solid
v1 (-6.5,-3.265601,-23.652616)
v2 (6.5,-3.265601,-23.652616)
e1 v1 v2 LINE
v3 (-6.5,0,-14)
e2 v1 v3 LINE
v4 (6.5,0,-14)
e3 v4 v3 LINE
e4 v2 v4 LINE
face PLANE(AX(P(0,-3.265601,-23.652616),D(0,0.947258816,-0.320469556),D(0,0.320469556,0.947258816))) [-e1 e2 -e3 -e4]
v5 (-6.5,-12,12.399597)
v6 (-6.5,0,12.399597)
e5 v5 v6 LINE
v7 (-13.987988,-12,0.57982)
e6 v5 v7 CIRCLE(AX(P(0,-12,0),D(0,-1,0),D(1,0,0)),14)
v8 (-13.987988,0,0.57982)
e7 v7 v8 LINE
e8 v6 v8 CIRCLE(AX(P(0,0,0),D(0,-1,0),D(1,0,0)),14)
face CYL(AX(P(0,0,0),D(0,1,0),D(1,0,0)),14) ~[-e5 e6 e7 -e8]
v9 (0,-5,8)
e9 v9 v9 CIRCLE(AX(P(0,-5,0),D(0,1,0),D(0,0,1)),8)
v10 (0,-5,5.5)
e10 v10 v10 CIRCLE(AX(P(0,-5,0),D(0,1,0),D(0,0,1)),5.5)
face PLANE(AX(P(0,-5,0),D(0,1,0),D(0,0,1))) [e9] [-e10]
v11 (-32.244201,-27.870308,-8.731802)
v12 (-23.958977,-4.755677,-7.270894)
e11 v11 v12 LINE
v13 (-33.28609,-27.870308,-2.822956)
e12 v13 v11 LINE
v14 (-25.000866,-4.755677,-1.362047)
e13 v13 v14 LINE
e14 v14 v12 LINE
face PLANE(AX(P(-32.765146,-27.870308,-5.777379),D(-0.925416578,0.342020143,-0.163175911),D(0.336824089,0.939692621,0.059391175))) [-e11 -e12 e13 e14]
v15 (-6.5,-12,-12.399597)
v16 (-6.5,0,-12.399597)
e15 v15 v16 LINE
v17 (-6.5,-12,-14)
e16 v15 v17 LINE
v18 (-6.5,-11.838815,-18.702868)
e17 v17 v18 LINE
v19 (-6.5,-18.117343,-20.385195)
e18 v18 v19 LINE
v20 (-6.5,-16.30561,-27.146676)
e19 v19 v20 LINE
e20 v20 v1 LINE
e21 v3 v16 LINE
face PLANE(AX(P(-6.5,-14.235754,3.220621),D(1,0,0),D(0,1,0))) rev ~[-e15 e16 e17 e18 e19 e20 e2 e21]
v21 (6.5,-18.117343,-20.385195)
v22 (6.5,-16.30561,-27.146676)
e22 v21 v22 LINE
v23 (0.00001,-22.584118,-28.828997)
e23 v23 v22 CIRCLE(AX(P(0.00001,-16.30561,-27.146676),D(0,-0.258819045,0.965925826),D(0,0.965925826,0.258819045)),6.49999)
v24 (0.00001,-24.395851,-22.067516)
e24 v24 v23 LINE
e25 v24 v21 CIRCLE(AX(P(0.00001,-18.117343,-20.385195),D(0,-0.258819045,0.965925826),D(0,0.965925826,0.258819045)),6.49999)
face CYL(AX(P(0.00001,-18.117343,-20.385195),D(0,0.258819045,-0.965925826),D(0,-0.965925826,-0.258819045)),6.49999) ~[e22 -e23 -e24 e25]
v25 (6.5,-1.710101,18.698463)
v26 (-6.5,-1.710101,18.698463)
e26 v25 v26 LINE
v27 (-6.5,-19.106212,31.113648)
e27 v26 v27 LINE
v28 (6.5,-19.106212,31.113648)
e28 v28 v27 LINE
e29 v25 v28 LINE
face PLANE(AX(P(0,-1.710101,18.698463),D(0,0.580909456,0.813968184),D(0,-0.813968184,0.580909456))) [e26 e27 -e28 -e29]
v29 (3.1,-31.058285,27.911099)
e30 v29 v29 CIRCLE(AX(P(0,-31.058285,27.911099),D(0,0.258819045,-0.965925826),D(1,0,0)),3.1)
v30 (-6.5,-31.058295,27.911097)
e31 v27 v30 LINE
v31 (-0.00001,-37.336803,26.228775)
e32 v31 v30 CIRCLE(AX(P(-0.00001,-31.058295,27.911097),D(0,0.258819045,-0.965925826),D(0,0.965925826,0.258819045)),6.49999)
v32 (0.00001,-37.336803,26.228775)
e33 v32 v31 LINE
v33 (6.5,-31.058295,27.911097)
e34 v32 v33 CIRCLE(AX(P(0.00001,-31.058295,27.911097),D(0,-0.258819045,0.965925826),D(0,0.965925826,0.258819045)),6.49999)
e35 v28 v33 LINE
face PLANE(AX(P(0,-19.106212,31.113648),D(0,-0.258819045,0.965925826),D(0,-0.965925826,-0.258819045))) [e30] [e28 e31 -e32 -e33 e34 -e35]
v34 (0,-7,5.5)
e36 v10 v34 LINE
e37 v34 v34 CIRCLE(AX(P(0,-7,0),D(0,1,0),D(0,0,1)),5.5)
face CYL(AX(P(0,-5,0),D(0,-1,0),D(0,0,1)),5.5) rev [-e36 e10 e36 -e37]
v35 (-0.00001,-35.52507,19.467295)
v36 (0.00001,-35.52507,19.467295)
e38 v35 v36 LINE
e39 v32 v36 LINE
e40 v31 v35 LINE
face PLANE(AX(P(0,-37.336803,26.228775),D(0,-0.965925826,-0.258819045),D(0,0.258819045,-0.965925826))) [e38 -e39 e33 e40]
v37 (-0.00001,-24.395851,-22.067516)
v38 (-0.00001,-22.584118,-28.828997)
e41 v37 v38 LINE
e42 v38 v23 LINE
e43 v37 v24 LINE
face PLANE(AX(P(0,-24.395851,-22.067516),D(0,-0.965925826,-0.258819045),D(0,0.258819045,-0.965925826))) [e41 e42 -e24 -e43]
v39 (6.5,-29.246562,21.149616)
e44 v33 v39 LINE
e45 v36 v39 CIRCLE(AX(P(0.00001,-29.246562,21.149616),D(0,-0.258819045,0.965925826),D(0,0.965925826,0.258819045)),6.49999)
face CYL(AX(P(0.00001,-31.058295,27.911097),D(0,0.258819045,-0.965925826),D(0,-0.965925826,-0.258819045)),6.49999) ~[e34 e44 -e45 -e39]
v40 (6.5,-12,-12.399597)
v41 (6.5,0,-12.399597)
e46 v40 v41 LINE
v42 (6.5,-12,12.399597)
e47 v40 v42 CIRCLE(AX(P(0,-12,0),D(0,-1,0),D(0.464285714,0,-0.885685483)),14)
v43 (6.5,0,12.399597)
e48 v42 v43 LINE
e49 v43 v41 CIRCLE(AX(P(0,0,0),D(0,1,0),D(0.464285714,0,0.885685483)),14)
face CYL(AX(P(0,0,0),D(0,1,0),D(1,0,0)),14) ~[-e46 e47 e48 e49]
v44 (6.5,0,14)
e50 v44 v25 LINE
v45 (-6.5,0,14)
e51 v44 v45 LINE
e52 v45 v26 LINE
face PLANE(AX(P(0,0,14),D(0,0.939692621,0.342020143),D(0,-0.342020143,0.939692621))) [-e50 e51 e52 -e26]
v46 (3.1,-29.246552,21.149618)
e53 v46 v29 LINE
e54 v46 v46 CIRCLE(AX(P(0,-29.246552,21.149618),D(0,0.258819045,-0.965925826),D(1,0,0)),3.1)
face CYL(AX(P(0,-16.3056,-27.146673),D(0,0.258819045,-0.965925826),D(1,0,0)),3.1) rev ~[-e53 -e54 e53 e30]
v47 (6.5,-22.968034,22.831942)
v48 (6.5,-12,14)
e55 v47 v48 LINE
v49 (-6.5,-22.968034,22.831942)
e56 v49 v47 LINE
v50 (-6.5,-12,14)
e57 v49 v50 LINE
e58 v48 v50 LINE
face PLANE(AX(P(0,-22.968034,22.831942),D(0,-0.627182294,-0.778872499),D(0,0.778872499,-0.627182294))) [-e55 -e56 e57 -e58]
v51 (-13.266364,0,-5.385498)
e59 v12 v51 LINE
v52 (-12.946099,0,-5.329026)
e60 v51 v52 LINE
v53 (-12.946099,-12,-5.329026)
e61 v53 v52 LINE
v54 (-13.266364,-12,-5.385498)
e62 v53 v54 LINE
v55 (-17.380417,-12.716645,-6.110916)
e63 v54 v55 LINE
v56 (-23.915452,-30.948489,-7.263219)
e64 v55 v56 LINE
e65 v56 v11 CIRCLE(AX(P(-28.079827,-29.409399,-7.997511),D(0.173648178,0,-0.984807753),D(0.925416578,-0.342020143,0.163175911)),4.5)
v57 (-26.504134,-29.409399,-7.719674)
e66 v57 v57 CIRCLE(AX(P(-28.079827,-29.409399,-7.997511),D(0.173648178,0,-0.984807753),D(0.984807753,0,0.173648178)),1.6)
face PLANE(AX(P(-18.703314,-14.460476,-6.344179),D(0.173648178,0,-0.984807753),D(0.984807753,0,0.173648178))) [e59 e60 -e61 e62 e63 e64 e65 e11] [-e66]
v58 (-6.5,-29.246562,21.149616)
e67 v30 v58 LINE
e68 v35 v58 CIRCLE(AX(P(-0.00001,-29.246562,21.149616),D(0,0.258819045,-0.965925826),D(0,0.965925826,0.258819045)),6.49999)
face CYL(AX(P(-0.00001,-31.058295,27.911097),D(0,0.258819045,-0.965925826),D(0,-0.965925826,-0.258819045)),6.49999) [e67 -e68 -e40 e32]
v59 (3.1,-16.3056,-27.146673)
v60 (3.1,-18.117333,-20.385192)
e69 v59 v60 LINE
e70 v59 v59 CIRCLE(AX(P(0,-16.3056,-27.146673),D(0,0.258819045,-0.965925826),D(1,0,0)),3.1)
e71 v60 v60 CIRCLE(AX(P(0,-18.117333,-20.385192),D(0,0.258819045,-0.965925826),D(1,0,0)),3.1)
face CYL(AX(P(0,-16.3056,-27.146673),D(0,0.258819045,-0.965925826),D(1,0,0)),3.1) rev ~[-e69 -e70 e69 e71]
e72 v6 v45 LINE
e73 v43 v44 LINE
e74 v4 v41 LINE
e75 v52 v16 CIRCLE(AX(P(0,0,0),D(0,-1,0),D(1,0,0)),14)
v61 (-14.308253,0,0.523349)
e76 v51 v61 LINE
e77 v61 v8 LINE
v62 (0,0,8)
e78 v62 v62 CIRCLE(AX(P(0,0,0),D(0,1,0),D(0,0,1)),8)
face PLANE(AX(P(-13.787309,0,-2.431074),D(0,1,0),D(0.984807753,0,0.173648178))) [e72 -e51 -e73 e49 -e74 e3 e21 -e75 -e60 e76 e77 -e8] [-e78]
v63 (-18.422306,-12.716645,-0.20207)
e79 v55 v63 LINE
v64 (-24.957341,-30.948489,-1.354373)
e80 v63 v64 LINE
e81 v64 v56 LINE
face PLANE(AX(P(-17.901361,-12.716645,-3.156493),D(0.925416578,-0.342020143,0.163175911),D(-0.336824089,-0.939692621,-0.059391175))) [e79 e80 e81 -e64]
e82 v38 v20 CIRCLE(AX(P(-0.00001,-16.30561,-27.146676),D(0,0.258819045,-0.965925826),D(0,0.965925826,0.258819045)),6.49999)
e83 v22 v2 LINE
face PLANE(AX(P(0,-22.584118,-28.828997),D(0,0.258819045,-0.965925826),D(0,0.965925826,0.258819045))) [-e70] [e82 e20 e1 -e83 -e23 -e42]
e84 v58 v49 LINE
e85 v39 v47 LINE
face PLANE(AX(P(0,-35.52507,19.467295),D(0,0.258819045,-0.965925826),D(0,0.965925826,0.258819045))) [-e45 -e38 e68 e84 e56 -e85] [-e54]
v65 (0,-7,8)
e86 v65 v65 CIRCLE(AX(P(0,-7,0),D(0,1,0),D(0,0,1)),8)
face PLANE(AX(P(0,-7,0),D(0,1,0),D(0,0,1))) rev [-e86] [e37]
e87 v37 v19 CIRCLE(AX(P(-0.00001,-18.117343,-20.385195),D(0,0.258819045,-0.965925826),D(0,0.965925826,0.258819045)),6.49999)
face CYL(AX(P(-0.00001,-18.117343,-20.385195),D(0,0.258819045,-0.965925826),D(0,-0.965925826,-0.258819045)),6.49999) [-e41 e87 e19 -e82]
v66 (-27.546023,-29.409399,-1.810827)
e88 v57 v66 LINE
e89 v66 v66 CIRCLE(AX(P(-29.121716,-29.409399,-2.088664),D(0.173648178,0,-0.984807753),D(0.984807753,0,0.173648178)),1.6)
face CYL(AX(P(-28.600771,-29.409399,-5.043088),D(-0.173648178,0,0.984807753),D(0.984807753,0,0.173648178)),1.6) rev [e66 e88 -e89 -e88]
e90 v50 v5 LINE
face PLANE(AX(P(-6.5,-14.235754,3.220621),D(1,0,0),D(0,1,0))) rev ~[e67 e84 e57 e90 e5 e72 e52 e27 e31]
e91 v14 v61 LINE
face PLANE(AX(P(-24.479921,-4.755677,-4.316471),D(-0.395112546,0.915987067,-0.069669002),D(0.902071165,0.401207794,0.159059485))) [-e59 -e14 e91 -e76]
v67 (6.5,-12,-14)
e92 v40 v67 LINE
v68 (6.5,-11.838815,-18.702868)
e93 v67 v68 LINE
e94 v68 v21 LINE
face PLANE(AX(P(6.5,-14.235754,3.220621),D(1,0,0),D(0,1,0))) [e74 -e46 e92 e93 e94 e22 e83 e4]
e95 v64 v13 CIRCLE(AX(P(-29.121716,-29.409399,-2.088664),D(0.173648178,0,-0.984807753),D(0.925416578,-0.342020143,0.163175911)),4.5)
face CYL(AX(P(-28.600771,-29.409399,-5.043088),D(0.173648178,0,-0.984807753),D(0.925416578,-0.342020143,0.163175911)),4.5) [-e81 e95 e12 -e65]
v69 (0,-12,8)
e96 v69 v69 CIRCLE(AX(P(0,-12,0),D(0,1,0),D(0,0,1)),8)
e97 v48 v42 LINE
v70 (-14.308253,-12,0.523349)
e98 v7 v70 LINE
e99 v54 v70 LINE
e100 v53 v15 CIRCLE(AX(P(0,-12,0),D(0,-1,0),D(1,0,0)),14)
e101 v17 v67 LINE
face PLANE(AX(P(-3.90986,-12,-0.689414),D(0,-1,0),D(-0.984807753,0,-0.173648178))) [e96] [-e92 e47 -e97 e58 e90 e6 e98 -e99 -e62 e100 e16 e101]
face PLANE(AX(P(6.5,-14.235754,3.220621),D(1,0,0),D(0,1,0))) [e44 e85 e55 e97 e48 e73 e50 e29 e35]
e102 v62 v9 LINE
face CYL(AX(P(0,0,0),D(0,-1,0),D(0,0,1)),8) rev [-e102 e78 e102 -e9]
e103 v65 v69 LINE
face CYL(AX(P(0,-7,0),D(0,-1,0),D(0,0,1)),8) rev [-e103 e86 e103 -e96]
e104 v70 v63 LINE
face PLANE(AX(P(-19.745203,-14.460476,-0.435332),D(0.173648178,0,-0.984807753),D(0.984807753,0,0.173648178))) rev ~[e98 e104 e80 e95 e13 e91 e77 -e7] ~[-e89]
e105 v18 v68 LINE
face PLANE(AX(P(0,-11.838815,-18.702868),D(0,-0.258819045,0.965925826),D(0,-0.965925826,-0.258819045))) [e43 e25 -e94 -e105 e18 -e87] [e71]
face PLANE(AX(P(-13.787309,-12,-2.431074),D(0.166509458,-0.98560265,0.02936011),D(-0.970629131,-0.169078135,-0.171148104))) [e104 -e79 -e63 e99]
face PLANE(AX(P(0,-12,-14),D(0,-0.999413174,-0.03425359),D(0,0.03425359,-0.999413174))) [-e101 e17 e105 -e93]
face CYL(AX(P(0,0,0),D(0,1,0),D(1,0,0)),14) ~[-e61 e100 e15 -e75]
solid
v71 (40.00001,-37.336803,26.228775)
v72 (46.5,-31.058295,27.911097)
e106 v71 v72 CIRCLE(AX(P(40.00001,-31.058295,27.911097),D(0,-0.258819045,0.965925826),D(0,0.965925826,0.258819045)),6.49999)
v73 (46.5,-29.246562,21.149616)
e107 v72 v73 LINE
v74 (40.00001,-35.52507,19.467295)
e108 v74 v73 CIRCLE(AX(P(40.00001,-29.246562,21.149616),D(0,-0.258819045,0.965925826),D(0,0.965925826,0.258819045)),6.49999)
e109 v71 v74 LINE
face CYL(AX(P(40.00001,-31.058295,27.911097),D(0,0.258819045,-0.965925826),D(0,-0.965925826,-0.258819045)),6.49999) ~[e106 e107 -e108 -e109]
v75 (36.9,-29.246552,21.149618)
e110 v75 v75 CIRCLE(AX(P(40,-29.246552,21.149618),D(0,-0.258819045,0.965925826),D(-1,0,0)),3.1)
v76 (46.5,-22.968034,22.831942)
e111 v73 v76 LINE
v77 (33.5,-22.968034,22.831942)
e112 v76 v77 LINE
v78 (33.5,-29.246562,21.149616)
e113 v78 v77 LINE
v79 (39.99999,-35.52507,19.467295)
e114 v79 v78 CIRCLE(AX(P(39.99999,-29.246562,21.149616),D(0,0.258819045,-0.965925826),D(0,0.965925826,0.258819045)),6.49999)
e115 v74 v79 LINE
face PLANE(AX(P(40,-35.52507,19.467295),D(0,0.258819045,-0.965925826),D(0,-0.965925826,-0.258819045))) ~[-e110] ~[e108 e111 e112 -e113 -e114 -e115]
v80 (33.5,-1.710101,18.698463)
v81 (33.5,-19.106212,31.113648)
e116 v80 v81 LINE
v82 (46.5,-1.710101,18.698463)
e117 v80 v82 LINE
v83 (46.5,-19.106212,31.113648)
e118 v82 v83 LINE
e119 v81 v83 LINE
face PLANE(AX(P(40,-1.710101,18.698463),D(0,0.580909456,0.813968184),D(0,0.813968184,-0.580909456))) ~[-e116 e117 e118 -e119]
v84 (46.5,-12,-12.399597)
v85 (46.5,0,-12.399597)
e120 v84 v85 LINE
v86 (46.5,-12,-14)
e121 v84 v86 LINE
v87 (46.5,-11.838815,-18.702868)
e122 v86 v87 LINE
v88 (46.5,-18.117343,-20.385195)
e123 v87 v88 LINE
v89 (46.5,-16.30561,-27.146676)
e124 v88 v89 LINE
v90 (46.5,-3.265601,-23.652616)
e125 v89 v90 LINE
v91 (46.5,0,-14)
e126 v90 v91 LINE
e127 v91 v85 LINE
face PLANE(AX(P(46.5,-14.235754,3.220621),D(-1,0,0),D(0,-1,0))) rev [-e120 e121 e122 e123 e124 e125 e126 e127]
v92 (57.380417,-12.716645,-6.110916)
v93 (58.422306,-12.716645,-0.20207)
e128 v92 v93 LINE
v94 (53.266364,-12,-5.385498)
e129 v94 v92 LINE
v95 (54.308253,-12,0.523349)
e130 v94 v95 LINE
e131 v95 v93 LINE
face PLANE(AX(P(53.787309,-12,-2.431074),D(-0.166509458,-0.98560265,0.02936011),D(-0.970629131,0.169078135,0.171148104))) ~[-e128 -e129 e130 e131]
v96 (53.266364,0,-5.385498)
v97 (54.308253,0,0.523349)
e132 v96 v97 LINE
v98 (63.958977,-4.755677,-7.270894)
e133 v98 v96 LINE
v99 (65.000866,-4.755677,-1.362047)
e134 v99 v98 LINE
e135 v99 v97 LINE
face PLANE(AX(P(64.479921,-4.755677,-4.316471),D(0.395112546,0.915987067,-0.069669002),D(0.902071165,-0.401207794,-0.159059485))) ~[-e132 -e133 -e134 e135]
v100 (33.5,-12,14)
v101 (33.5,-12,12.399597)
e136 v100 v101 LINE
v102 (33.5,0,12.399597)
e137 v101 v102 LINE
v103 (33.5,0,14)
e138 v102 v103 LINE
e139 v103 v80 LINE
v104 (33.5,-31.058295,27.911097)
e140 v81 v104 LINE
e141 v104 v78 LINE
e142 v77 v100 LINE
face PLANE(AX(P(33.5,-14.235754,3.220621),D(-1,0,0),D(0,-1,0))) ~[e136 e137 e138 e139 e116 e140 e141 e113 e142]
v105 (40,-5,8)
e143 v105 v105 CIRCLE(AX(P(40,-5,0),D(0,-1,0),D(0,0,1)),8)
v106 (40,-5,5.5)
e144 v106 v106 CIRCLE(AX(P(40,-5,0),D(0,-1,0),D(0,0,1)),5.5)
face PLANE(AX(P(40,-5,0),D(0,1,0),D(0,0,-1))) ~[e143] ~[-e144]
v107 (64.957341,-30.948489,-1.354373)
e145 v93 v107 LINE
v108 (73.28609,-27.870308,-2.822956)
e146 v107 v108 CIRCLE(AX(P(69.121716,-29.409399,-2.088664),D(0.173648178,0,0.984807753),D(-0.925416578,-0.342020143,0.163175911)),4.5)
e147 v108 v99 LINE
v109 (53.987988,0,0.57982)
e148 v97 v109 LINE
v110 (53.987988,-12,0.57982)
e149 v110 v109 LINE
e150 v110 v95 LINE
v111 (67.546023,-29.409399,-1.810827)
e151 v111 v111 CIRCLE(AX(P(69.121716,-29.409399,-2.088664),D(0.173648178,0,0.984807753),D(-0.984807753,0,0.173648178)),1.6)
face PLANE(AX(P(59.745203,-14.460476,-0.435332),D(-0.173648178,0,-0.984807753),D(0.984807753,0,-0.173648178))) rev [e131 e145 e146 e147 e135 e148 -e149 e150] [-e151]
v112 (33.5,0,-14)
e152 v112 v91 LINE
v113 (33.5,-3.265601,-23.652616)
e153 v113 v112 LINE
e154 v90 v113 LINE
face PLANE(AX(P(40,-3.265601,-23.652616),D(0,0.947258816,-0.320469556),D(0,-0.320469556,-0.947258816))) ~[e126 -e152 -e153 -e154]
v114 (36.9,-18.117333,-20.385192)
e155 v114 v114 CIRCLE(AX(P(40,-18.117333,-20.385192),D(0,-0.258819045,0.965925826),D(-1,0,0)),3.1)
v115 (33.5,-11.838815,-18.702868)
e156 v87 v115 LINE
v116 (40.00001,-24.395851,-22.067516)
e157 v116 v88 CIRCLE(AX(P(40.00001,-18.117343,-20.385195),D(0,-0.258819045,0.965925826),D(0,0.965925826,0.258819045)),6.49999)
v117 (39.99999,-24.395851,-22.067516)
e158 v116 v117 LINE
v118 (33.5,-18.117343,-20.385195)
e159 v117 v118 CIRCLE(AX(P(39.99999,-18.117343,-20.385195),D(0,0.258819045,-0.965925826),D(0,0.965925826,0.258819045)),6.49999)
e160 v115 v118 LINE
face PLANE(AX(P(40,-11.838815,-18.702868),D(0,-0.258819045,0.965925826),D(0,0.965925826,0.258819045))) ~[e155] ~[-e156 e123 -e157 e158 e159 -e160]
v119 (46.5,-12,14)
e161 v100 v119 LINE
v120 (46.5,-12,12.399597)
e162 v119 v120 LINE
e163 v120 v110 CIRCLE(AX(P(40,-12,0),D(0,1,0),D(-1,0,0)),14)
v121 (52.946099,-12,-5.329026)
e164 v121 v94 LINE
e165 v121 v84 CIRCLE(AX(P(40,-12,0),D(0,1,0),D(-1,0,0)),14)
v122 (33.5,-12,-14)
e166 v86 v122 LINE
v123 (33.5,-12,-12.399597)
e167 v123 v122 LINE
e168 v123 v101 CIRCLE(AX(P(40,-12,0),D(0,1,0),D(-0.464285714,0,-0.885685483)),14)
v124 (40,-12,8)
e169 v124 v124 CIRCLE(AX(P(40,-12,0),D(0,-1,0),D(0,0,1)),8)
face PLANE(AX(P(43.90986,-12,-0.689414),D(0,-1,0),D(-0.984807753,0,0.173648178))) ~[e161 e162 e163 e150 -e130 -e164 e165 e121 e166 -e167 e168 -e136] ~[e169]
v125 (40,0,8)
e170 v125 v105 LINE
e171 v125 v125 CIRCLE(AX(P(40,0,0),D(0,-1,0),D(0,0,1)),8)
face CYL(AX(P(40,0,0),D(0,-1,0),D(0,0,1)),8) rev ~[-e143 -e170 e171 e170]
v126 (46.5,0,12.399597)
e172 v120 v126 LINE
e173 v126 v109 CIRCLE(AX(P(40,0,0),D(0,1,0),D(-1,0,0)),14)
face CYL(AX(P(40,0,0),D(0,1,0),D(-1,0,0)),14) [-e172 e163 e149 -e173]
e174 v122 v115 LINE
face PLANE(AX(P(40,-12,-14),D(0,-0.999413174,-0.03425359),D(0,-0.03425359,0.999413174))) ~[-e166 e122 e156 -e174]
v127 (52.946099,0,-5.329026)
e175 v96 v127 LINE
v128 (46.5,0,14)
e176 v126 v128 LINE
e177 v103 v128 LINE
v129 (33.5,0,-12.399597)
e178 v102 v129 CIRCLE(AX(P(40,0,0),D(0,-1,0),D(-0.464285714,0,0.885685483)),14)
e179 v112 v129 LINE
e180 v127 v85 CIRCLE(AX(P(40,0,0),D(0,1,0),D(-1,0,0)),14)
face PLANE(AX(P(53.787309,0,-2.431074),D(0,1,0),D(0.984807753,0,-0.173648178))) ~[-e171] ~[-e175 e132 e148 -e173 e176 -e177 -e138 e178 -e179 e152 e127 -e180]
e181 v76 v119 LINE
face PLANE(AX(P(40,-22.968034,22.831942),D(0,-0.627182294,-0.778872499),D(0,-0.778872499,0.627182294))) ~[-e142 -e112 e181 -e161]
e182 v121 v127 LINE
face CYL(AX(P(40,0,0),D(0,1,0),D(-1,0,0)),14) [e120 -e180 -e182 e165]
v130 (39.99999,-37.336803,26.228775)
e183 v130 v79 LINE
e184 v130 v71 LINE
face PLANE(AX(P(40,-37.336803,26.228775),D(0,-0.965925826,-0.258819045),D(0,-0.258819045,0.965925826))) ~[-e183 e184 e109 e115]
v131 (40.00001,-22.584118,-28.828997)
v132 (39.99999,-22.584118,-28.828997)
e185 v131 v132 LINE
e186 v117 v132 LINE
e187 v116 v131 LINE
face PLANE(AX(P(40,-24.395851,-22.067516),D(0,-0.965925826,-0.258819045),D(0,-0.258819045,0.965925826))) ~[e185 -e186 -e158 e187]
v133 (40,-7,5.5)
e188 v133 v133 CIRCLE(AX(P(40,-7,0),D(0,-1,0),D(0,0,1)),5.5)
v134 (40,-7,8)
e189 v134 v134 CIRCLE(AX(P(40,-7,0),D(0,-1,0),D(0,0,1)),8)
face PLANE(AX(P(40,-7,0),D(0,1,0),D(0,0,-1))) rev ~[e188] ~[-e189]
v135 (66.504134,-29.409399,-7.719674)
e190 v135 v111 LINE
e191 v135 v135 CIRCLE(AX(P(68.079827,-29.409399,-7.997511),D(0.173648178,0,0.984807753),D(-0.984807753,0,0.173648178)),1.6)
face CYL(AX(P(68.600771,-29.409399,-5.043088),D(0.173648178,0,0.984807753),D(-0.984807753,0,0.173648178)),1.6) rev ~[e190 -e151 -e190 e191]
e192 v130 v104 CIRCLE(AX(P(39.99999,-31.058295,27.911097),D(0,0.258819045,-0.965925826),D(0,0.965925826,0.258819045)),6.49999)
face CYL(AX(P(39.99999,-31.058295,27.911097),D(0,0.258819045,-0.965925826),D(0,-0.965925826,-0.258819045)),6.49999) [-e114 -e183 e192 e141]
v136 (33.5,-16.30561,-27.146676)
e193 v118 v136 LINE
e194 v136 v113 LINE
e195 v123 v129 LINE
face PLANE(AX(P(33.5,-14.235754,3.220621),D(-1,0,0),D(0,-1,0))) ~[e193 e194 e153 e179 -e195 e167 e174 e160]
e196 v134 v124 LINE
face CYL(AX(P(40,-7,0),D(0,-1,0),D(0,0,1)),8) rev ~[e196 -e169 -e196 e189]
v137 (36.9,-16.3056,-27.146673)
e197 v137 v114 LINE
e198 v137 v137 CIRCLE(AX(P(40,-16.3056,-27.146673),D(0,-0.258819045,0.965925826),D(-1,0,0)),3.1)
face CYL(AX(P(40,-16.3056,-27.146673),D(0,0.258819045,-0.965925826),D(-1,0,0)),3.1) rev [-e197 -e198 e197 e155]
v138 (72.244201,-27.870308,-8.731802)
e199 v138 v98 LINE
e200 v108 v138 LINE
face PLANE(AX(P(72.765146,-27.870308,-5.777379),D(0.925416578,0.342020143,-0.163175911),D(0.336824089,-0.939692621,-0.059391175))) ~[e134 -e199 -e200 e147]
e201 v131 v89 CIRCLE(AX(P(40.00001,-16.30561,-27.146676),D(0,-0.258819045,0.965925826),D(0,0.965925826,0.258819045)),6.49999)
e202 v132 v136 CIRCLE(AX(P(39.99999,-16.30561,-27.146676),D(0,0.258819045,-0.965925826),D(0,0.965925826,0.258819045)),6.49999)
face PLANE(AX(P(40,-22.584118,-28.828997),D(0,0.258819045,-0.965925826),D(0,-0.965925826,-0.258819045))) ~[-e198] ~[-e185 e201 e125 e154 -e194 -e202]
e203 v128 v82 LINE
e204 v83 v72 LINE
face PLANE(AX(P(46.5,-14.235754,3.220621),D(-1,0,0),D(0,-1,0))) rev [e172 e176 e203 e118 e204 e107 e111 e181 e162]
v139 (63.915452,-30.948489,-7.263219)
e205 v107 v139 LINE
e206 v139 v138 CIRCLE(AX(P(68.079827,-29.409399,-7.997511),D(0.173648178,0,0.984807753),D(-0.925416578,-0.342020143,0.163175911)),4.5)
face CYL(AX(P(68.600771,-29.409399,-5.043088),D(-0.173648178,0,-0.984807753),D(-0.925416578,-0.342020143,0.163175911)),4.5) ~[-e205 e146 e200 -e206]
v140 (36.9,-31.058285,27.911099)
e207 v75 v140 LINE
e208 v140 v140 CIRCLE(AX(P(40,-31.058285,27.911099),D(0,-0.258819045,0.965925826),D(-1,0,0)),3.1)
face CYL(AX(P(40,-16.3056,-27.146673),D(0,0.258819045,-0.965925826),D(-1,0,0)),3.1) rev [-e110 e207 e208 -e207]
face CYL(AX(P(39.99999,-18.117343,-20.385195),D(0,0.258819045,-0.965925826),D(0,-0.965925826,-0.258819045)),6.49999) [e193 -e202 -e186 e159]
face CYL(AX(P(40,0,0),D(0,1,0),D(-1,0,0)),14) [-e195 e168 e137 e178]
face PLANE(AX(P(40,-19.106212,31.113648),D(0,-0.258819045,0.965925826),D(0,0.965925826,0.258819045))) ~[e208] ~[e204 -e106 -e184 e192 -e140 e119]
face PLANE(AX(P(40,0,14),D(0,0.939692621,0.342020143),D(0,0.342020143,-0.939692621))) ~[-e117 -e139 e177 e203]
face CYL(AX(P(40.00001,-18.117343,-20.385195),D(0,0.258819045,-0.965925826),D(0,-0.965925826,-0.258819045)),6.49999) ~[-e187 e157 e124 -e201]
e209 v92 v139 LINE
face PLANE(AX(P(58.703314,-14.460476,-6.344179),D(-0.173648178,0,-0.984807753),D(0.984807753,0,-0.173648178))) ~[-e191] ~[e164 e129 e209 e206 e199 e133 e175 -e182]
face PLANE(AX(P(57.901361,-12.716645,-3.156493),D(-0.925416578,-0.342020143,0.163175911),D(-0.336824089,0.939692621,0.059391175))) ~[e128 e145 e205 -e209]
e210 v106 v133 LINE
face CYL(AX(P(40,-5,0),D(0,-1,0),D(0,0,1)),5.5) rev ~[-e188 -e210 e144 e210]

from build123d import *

# Parameters (mm, degrees)
F0_R      = 14
F1_DEPTH  = 12
F3_DEPTH  = 6.5
F4_R      = 6.49999
F5_R      = 3.1
F6_DEPTH  = 61.7194243546
F9_R      = 1.6
F10_DEPTH = 3


# Not quite as in the source:
# - a fillet or chamfer is up to 0.001 mm smaller than in the source, because OpenCascade refuses the exact size


with BuildPart() as f1:
    # F0 (on Front) → F1 (new body)
    with BuildSketch(Plane.XZ):
        Circle(F0_R)
    extrude(amount=F1_DEPTH)

    # F2 (on Right) → F3 (join, symmetric)
    with BuildSketch(Plane.YZ):
        Polygon((-37.3368032832, 26.2287753615), (-35.5250699675, 19.4672945775), (-22.9680342257, 22.8319421638), (-12, 14), (-12, -14), (-11.8388152863, -18.7028683666), (-24.3958510281, -22.0675159529), (-22.5841177123, -28.828996737), (-3.2656011866, -23.6526158349), (0, -14), (0, 14), (-1.7101007166, 18.6984631039), (-19.1062115093, 31.1136477049), align=None)
    extrude(amount=F3_DEPTH, both=True)

    # F4 (radius 6.5 in the source; OpenCascade refuses exactly that, so slightly less here)
    f4_edges = [f1.edges().sort_by_distance(p)[0] for p in [
        (-6.5, -36.430937, 22.848035),
        (6.5, -36.430937, 22.848035),
        (-6.5, -23.489984, -25.448256),
        (6.5, -23.489984, -25.448256),
    ]]
    fillet(f4_edges, radius=F4_R)

    # F5 (on face) → F6 (cut, through all)
    with BuildSketch(Plane(origin=(0, 5.6944001585, -21.2517907103), x_dir=(1, 0, 0), z_dir=(0, 0.2588190451, -0.9659258263))):
        with Locations((0, 22.776075969)):
            Circle(F5_R)
    extrude(amount=-F6_DEPTH, mode=Mode.SUBTRACT)

    # F9 (on line) → F10 (join, symmetric)
    with BuildSketch(Plane(origin=(0, 0, 0), x_dir=(0.984807753, 0, 0.1736481777), z_dir=(0.1736481777, 0, -0.984807753))):
        with BuildLine():
            Line((-18.1775185709, 12.7166448356), (-24.8133673259, 30.9484894489))
            ThreePointArc((-24.8133673259, 30.9484894489), (-30.5810747644, 33.6380155974), (-33.270600913, 27.8703081589))
            Line((-33.270600913, 27.8703081589), (-24.8575633616, 4.7556774576))
            Line((-24.8575633616, 4.7556774576), (-14, 0))
            Line((-14, 0), (-3.9701759072, 0))
            Line((-3.9701759072, 0), (-3.9701759072, 12))
            Line((-3.9701759072, 12), (-14, 12))
            Line((-14, 12), (-18.1775185709, 12.7166448356))
        make_face()
        with Locations((-29.0419841195, 29.4093988039)):
            Circle(F9_R, mode=Mode.SUBTRACT)
    extrude(amount=F10_DEPTH, both=True)

    # F11 (on Right) → F12 (revolve, cut)
    with BuildSketch(Plane.YZ):
        Polygon((0, 0), (0, 8), (-5, 8), (-5, 5.5), (-7, 5.5), (-7, 8), (-12, 8), (-12, 0), align=None)
    revolve(axis=Axis((0, 2.6090382598, 0), (0, 1, 0)), mode=Mode.SUBTRACT)


with BuildPart() as f14_1:
    # F14: instance of F1
    add(f1.part.mirror(Plane.YZ.offset(20)))


solid = Compound([f1.part, f14_1.part])
